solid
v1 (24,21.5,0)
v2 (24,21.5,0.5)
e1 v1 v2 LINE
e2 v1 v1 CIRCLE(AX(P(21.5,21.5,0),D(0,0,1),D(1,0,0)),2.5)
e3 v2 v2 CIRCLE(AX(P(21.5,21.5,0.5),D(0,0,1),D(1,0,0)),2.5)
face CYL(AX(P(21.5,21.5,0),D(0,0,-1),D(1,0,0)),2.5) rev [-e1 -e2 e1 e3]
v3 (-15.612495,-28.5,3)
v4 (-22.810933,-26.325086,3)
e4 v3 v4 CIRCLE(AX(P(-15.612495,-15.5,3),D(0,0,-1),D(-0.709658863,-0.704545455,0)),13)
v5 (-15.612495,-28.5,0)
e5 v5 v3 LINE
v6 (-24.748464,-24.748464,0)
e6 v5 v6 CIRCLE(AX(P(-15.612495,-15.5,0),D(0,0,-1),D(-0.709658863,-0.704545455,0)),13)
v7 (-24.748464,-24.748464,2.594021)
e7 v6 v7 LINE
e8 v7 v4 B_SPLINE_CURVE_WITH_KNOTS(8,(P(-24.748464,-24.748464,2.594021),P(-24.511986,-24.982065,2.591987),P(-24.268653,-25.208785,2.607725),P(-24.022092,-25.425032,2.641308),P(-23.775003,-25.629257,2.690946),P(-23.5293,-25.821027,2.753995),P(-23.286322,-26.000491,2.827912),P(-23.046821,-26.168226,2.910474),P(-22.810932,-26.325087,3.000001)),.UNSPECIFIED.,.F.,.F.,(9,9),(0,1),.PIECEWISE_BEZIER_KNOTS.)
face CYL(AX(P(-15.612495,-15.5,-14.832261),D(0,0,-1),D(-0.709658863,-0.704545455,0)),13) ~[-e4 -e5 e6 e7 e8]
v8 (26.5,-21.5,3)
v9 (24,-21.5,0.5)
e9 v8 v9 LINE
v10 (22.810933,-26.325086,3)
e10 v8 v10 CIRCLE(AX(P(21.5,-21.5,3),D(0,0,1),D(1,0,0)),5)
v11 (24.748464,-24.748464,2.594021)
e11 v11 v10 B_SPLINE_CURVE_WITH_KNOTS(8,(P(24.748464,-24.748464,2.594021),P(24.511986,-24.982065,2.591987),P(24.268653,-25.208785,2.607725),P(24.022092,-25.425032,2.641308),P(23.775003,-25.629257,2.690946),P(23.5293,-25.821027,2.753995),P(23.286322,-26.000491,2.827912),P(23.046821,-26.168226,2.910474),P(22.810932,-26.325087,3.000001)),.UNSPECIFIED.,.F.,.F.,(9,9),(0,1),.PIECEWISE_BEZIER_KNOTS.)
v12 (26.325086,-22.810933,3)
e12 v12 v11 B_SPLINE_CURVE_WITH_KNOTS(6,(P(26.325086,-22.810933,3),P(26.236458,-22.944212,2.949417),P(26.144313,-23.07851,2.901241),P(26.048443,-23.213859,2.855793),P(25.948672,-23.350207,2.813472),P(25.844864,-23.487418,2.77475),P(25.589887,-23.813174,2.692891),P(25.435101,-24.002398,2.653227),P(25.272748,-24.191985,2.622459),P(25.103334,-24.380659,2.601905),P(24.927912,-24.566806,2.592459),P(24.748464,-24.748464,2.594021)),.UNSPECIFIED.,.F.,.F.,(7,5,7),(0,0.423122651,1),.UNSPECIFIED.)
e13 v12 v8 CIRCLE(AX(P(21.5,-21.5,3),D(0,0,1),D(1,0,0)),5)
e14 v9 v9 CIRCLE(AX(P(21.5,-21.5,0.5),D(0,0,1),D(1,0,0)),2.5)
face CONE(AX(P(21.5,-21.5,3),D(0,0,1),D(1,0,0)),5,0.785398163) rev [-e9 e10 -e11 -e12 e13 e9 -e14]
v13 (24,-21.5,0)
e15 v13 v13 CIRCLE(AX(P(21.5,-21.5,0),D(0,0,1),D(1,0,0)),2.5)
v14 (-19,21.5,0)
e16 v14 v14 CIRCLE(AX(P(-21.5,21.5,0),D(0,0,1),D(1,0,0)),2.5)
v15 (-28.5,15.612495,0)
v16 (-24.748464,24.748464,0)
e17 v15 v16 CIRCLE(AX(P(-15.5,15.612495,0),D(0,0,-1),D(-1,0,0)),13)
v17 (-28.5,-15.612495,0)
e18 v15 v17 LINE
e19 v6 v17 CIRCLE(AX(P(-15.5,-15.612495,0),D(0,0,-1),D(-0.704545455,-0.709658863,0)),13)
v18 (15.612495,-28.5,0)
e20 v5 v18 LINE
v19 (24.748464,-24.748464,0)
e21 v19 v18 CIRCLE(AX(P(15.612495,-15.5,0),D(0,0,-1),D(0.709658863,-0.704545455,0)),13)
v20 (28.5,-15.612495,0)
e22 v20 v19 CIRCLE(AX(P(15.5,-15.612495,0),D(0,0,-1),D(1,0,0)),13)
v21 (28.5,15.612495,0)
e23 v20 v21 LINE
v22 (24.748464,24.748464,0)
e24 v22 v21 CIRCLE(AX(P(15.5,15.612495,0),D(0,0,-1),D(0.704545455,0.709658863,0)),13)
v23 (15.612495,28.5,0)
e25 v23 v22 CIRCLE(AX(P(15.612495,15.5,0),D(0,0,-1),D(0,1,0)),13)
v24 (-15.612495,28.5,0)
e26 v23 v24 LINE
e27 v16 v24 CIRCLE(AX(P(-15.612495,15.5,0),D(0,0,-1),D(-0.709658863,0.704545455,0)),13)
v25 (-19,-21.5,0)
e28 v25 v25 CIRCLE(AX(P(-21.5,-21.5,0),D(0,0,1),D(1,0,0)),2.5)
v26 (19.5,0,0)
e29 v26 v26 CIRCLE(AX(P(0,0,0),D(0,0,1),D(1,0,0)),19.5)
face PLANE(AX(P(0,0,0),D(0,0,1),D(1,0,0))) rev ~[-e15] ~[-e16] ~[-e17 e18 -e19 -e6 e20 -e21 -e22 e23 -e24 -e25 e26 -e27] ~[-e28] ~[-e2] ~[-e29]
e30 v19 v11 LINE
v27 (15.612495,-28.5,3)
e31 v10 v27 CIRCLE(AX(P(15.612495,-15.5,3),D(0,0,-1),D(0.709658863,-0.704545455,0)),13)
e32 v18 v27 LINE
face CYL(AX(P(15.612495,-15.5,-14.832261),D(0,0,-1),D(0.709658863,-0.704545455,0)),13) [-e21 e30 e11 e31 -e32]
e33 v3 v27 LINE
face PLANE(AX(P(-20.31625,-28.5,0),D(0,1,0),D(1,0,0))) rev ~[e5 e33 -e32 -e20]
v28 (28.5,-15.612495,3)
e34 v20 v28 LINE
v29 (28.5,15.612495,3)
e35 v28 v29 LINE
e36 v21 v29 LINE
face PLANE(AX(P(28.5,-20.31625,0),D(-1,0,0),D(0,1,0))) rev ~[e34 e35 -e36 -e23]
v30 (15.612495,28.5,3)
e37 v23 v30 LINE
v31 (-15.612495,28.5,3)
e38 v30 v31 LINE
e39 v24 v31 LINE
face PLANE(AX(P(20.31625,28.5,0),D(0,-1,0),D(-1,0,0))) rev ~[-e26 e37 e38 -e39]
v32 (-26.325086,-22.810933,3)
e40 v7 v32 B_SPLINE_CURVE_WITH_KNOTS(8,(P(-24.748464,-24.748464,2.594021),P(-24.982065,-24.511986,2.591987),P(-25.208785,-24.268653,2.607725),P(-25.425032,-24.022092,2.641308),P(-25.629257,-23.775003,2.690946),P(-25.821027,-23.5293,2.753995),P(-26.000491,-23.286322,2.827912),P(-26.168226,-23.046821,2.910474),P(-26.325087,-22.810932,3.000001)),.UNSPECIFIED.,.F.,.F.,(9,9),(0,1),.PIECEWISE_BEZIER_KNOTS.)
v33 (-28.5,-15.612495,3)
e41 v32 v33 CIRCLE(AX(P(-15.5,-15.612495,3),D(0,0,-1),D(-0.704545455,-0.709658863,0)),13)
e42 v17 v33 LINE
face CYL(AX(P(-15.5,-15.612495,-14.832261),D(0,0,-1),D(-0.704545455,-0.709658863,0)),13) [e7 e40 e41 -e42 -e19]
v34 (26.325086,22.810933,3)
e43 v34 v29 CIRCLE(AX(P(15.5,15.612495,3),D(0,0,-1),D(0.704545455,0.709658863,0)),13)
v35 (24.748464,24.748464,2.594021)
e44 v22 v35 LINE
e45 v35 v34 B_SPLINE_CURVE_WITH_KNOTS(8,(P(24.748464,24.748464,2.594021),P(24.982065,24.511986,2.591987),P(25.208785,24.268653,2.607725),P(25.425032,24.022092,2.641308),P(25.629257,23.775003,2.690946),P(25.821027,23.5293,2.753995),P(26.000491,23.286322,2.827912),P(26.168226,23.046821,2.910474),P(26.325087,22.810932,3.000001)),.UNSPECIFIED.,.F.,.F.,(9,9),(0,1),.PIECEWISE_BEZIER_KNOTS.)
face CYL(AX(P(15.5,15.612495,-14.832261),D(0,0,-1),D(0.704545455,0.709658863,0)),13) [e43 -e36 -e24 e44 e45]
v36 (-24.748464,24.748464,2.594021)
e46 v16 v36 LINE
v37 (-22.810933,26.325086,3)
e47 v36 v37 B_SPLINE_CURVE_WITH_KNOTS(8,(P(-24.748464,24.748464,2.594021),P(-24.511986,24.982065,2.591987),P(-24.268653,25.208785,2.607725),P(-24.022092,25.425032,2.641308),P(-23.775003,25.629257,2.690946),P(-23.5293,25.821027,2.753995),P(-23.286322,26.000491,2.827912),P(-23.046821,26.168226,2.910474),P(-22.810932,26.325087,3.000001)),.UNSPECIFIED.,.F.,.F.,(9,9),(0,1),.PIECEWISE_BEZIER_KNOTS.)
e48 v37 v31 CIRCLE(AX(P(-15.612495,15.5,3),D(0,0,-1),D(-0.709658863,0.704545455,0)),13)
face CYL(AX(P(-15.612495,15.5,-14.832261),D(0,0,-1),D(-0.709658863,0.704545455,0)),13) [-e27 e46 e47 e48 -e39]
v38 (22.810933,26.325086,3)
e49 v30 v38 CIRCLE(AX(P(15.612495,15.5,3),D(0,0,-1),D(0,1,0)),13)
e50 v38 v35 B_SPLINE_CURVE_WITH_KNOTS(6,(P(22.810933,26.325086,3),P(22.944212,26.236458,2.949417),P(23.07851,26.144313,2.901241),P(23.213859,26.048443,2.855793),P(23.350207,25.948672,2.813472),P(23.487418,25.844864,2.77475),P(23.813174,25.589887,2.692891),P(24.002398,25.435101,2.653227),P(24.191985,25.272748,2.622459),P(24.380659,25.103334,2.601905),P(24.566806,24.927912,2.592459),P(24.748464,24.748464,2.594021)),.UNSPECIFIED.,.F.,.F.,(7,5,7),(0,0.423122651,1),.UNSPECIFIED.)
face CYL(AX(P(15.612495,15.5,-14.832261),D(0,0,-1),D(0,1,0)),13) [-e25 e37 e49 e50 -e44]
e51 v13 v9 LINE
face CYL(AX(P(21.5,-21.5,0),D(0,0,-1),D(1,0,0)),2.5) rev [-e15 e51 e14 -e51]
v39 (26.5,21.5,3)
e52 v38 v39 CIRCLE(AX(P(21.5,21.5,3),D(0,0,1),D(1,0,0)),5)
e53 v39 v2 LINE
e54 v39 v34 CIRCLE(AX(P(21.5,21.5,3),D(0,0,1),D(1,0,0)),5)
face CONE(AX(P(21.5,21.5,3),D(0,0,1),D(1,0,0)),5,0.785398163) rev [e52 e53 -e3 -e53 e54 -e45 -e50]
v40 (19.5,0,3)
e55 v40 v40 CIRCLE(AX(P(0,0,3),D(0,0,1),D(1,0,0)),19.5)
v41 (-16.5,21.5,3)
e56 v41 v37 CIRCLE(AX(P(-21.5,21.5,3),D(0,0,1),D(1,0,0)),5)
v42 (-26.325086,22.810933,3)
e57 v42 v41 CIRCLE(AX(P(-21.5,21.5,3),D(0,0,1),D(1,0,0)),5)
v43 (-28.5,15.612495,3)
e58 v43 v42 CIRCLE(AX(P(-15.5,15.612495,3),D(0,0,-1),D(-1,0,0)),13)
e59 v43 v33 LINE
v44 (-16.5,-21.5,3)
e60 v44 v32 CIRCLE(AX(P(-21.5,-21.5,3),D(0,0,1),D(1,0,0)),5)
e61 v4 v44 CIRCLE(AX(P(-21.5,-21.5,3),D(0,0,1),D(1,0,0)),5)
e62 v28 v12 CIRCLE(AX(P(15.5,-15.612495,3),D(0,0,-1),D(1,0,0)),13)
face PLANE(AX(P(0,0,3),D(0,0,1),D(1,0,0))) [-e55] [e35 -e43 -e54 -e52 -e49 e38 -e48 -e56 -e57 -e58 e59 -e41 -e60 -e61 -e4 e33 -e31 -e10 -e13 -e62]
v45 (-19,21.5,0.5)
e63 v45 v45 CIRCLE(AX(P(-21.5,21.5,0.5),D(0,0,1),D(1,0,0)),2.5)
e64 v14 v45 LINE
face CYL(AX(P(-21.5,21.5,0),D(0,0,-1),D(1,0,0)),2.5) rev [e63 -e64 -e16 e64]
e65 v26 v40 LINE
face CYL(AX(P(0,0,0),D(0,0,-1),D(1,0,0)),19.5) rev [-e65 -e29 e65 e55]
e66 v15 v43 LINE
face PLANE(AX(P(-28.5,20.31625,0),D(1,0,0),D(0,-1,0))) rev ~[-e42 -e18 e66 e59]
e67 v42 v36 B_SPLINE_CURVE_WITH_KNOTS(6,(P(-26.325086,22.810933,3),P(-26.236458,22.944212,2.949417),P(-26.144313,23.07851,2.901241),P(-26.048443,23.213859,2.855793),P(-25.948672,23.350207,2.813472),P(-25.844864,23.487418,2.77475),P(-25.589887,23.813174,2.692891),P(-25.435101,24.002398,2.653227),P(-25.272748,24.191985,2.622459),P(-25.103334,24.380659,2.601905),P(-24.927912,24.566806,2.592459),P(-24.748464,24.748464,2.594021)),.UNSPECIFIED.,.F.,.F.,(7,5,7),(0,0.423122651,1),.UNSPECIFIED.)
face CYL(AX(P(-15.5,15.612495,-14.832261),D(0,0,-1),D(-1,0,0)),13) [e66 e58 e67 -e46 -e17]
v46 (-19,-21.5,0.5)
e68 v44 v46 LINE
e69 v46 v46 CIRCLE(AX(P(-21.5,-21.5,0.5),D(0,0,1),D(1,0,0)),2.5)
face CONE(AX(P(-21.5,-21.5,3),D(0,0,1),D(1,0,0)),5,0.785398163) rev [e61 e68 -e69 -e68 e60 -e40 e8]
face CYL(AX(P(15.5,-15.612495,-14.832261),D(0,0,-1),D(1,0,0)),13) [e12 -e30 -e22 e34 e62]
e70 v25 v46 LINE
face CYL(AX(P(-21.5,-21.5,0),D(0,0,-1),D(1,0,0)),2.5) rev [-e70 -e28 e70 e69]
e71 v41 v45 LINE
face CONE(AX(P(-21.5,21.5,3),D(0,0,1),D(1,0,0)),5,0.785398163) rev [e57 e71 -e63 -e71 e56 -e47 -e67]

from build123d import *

# Parameters (mm, degrees)
F0_R        = 2.5
F0_R_2      = 23.5
F0_R_3      = 19.5
F1_DEPTH    = 3
F2_DEPTH    = 2.5
F3_T1_DEPTH = 32.6645215065


# Not quite as in the source:
# - a fillet or chamfer that OpenCascade refuses, or shapes differently, is made with other operations: its cross-section is extruded or revolved along the edge and cut away or added


with BuildPart() as f1:
    # F0 (on Top) → F1 (new body)
    with BuildSketch(Plane.XY):
        with BuildLine():
            Line((-20.3162496539, -28.5), (20.3162496539, -28.5))
            ThreePointArc((20.3162496539, -28.5), (24.7487373415, -24.7487373415), (28.5, -20.3162496539))
            Line((28.5, -20.3162496539), (28.5, 20.3162496539))
            ThreePointArc((28.5, 20.3162496539), (24.7487373415, 24.7487373415), (20.3162496539, 28.5))
            Line((20.3162496539, 28.5), (-20.3162496539, 28.5))
            ThreePointArc((-20.3162496539, 28.5), (-24.7487373415, 24.7487373415), (-28.5, 20.3162496539))
            Line((-28.5, 20.3162496539), (-28.5, -20.3162496539))
            ThreePointArc((-28.5, -20.3162496539), (-24.7487373415, -24.7487373415), (-20.3162496539, -28.5))
        make_face()
        with Locations((-21.5, -21.5)):
            Circle(F0_R, mode=Mode.SUBTRACT)
        with Locations((21.5, -21.5)):
            Circle(F0_R, mode=Mode.SUBTRACT)
        with Locations((-21.5, 21.5)):
            Circle(F0_R, mode=Mode.SUBTRACT)
        Circle(F0_R_2, mode=Mode.SUBTRACT)
        with Locations((21.5, 21.5)):
            Circle(F0_R, mode=Mode.SUBTRACT)
        Circle(F0_R_2)
        Circle(F0_R_3, mode=Mode.SUBTRACT)
    extrude(amount=F1_DEPTH)

    # F0 (on Top) → F2 (join)
    with BuildSketch(Plane.XY):
        Circle(F0_R_2)
        Circle(F0_R_3, mode=Mode.SUBTRACT)
    extrude(amount=F2_DEPTH)

    # F3: fillet of radius 13 on 8 edges, made by hand

    # F3_s2 → F3_t1 (cut)
    with BuildSketch(Plane.XY.offset(-14.8322607533)):
        with BuildLine():
            ThreePointArc((-28.5, 15.612494996), (-27.5014203705, 20.6090847421), (-24.6590909091, 24.8380602209))
            ThreePointArc((-24.6590909091, 24.8380602209), (-26.675530534, 22.6586864299), (-28.5, 20.3162496539))
            Line((-28.5, 20.3162496539), (-28.5, 15.612494996))
        make_face()
        with BuildLine():
            ThreePointArc((-24.8380602209, 24.6590909091), (-20.6090847421, 27.5014203705), (-15.612494996, 28.5))
            Line((-15.612494996, 28.5), (-20.3162496539, 28.5))
            ThreePointArc((-20.3162496539, 28.5), (-22.6586864299, 26.675530534), (-24.8380602209, 24.6590909091))
        make_face()
        with BuildLine():
            ThreePointArc((15.612494996, 28.5), (20.6090847421, 27.5014203705), (24.8380602209, 24.6590909091))
            ThreePointArc((24.8380602209, 24.6590909091), (22.6586864299, 26.675530534), (20.3162496539, 28.5))
            Line((20.3162496539, 28.5), (15.612494996, 28.5))
        make_face()
        with BuildLine():
            ThreePointArc((24.6590909091, 24.8380602209), (27.5014203705, 20.6090847421), (28.5, 15.612494996))
            Line((28.5, 15.612494996), (28.5, 20.3162496539))
            ThreePointArc((28.5, 20.3162496539), (26.675530534, 22.6586864299), (24.6590909091, 24.8380602209))
        make_face()
        with BuildLine():
            ThreePointArc((28.5, -15.612494996), (27.5014203705, -20.6090847421), (24.6590909091, -24.8380602209))
            ThreePointArc((24.6590909091, -24.8380602209), (26.675530534, -22.6586864299), (28.5, -20.3162496539))
            Line((28.5, -20.3162496539), (28.5, -15.612494996))
        make_face()
        with BuildLine():
            ThreePointArc((24.8380602209, -24.6590909091), (20.6090847421, -27.5014203705), (15.612494996, -28.5))
            Line((15.612494996, -28.5), (20.3162496539, -28.5))
            ThreePointArc((20.3162496539, -28.5), (22.6586864299, -26.675530534), (24.8380602209, -24.6590909091))
        make_face()
        with BuildLine():
            ThreePointArc((-24.8380602209, -24.6590909091), (-20.6090847421, -27.5014203705), (-15.612494996, -28.5))
            Line((-15.612494996, -28.5), (-20.3162496539, -28.5))
            ThreePointArc((-20.3162496539, -28.5), (-22.6586864299, -26.675530534), (-24.8380602209, -24.6590909091))
        make_face()
        with BuildLine():
            ThreePointArc((-24.6590909091, -24.8380602209), (-27.5014203705, -20.6090847421), (-28.5, -15.612494996))
            Line((-28.5, -15.612494996), (-28.5, -20.3162496539))
            ThreePointArc((-28.5, -20.3162496539), (-26.675530534, -22.6586864299), (-24.6590909091, -24.8380602209))
        make_face()
    extrude(amount=F3_T1_DEPTH, mode=Mode.SUBTRACT)

    # F4: chamfer of 2.5 on 4 edges, made by hand

    # F4_s1 → F4_t2 (revolve, cut)
    with BuildSketch(Plane.XZ.offset(-21.5)):
        Polygon((-16.5, 3), (-19, 0.5), (-19, 3), align=None)
    revolve(axis=Axis((-21.5, 21.5, 3), (0, 0, 1)), mode=Mode.SUBTRACT)

    # F4_s3 → F4_t4 (revolve, cut)
    with BuildSketch(Plane.XZ.offset(-21.5)):
        Polygon((26.5, 3), (24, 0.5), (24, 3), align=None)
    revolve(axis=Axis((21.5, 21.5, 3), (0, 0, 1)), mode=Mode.SUBTRACT)

    # F4_s5 → F4_t6 (revolve, cut)
    with BuildSketch(Plane.XZ.offset(21.5)):
        Polygon((26.5, 3), (24, 0.5), (24, 3), align=None)
    revolve(axis=Axis((21.5, -21.5, 3), (0, 0, 1)), mode=Mode.SUBTRACT)

    # F4_s7 → F4_t8 (revolve, cut)
    with BuildSketch(Plane.XZ.offset(21.5)):
        Polygon((-16.5, 3), (-19, 0.5), (-19, 3), align=None)
    revolve(axis=Axis((-21.5, -21.5, 3), (0, 0, 1)), mode=Mode.SUBTRACT)


solid = f1.part
